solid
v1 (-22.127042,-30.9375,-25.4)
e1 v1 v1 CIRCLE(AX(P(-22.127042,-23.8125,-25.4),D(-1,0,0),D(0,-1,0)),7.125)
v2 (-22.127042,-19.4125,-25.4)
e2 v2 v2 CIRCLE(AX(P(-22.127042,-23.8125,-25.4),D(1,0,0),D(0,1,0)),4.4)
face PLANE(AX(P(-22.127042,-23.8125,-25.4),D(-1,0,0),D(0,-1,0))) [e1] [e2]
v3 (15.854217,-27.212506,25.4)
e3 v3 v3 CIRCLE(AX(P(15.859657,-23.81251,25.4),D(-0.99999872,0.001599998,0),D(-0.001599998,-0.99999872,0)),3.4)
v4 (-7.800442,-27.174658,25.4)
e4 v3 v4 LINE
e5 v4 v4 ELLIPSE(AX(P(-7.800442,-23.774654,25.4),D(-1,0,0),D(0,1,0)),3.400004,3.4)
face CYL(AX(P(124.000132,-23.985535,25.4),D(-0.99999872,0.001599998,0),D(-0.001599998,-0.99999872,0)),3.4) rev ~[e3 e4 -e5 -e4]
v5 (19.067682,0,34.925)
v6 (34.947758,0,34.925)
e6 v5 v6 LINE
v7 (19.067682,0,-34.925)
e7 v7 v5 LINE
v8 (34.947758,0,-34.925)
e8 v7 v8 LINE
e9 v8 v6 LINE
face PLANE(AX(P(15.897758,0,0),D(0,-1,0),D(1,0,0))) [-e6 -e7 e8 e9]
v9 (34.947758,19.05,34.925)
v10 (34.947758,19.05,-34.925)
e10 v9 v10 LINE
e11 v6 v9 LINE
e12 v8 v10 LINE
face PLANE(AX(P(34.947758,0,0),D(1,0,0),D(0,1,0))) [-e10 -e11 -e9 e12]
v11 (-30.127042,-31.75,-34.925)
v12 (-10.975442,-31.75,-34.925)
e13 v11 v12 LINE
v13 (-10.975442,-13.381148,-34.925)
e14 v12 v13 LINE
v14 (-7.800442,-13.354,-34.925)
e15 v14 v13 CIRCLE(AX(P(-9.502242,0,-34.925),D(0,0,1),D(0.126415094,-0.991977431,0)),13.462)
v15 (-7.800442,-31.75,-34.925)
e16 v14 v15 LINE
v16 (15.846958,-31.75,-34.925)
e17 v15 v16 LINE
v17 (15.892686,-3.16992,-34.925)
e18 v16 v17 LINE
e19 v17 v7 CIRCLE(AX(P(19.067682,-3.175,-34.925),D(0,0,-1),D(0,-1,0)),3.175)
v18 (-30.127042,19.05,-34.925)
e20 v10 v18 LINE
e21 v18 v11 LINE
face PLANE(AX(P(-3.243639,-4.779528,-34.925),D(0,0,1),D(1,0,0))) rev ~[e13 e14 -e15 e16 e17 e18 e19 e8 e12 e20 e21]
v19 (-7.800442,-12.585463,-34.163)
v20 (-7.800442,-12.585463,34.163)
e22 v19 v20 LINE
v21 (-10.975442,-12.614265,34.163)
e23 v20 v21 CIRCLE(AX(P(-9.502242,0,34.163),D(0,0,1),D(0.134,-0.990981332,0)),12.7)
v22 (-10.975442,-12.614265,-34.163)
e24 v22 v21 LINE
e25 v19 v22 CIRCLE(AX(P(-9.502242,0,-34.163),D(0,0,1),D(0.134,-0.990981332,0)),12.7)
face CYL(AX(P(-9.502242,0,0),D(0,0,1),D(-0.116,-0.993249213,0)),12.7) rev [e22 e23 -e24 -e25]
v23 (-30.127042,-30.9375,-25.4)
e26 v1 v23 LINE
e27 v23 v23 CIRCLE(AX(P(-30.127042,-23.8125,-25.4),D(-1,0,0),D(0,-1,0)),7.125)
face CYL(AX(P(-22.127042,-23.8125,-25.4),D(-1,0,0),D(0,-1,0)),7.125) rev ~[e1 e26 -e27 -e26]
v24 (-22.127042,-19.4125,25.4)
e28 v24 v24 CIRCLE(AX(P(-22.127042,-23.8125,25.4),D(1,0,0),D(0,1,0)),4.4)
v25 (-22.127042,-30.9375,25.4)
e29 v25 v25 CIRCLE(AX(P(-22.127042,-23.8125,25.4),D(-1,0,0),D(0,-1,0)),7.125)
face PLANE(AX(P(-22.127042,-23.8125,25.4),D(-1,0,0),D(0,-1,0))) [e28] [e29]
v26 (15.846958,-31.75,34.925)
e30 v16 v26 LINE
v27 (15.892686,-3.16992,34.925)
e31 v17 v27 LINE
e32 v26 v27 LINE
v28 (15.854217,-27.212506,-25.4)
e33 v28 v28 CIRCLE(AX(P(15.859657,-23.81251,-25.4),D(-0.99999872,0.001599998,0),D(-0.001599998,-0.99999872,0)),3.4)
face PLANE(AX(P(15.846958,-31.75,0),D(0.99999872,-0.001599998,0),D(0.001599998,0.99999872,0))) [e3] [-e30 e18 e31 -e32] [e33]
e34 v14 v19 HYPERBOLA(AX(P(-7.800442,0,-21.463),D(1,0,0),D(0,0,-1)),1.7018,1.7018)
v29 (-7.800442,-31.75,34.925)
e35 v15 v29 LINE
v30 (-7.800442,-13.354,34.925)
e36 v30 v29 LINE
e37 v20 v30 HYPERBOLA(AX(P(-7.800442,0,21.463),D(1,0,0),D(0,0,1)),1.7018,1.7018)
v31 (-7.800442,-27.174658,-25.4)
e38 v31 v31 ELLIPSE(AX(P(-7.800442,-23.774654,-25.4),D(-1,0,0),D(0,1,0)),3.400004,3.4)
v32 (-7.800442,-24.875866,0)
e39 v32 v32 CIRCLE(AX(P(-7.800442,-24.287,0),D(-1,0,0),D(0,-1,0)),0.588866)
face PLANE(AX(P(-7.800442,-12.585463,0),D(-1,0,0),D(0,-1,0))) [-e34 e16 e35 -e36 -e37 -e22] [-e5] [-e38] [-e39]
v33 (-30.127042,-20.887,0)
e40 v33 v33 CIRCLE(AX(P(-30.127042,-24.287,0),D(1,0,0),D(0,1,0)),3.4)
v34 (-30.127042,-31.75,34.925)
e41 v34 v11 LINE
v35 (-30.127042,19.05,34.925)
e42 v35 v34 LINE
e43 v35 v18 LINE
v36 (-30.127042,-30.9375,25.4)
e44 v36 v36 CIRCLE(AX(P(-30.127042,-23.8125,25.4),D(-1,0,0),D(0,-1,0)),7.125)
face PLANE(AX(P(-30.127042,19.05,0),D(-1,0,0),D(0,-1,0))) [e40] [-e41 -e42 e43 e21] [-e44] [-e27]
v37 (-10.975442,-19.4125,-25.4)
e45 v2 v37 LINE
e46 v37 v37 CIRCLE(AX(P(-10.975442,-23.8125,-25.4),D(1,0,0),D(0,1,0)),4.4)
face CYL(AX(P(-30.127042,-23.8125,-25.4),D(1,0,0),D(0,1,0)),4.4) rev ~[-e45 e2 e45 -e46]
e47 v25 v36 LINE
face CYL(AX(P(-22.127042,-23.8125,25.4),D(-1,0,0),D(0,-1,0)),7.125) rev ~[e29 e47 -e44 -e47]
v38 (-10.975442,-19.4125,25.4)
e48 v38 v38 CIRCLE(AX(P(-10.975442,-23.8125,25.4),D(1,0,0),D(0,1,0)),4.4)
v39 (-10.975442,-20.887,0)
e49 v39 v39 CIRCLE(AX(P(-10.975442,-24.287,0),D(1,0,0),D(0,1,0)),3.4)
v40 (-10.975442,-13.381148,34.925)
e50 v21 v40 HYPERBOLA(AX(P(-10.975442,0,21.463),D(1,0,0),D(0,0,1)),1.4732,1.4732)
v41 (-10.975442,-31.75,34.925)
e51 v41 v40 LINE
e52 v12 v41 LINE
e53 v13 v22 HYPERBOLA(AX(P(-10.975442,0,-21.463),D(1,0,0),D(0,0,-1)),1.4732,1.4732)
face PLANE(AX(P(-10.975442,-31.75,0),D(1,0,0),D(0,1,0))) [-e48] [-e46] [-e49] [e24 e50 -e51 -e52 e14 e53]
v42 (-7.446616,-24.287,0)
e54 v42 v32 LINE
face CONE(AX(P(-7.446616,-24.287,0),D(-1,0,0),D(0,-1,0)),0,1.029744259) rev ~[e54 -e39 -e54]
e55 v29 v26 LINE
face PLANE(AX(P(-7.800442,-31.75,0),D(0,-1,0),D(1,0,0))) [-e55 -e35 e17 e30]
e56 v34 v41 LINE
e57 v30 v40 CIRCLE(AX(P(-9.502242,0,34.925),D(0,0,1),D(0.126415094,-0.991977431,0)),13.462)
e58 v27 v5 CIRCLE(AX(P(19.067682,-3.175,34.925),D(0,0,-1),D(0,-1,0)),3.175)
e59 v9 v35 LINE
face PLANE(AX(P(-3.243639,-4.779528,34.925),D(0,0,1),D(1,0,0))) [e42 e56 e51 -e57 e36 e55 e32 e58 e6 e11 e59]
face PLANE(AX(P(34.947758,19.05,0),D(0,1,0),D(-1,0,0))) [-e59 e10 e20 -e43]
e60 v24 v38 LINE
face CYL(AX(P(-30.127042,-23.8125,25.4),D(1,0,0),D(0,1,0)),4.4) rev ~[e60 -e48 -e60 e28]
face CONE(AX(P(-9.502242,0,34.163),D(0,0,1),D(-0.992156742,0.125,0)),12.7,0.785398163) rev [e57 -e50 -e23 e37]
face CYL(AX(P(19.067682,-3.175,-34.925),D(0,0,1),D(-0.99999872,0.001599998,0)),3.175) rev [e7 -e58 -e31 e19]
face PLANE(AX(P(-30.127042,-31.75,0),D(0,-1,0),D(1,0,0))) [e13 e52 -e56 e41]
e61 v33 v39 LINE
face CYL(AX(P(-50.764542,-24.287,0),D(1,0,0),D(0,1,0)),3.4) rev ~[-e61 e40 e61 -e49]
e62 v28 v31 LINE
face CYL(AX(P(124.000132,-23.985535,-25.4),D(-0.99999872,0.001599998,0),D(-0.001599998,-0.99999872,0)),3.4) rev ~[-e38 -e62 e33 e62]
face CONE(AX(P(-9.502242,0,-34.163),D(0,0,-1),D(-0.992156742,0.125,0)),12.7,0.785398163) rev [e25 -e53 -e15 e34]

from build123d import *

# Parameters (mm, degrees)
F1_DEPTH       = 34.925
F3_D           = 8.8
F3_DEPTH       = 20.6375
F3_CBORE_D     = 14.25
F3_CBORE_DEPTH = 8
F3_TIP         = 2.6437867237
F5_D           = 6.8
F5_DEPTH       = 20.6375
F5_TIP         = 2.0429261047
F6_R           = 3.175
F7_SIZE        = 0.762
F9_D           = 6.8


# Not quite as in the source:
# - ends of sketch curves that miss each other by under 0.0002 mm in the source are joined


with BuildPart() as f1:
    # F0 (on Top) → F1 (new body, symmetric)
    with BuildSketch(Plane.XY):
        with BuildLine():
            Line((-30.1270424985, 1.5875), (-30.1270424985, -31.75))
            Line((-30.1270424985, -31.75), (-15.6690329313, -31.75))
            Line((-15.6690329313, -31.75), (-10.9754424985, -31.75))
            Line((-10.9754424985, -31.75), (-10.9754424985, -12.6142650107))
            ThreePointArc((-10.9754424985, -12.6142650107), (-19.4991930627, -7.8326866028), (-22.1026331175, 1.5875))
            ThreePointArc((-22.1026331175, 1.5875), (-0.5628331886, 9.0209179793), (-7.8004424985, -12.585462914))
            Line((-7.8004424985, -12.585462914), (-7.8004424985, -31.75))
            Line((-7.8004424985, -31.75), (15.8469575015, -31.75))
            Line((15.8469575015, -31.75), (15.8977575015, 0))
            Line((15.8977575015, 0), (34.9477575015, 0))
            Line((34.9477575015, 0), (34.9477575015, 19.05))
            Line((34.9477575015, 19.05), (-30.1270424985, 19.05))
            Line((-30.1270424985, 19.05), (-30.1270424985, 1.5875))
        make_face()
    extrude(amount=F1_DEPTH, both=True)

    # F3
    with Locations(Plane(origin=(-30.1270424985, 0, 0), x_dir=(0, -1, 0), z_dir=(-1, 0, 0))):
        with Locations((23.8125, 25.4), (23.8125, -25.4)):
            CounterBoreHole(F3_D / 2, F3_CBORE_D / 2, F3_CBORE_DEPTH, depth=F3_DEPTH)
            with Locations((0, 0, -(F3_DEPTH + F3_TIP / 2))):  # 118° drill point
                Cone(0, F3_D / 2, F3_TIP, mode=Mode.SUBTRACT)

    # F5
    with Locations(Plane(origin=(-30.1270424985, 0, 0), x_dir=(0, -1, 0), z_dir=(-1, 0, 0))):
        with Locations((24.2870002985, 0)):
            Hole(F5_D / 2, depth=F5_DEPTH)
            with Locations((0, 0, -(F5_DEPTH + F5_TIP / 2))):  # 118° drill point
                Cone(0, F5_D / 2, F5_TIP, mode=Mode.SUBTRACT)

    # F6
    f6_edges = [f1.edges().sort_by_distance(p)[0] for p in [
        (15.897758, 0, 0),
    ]]
    fillet(f6_edges, radius=F6_R)

    # F7
    f7_edges = [f1.edges().sort_by_distance(p)[0] for p in [
        (-9.617446, 12.699477, 34.925),
        (-9.617446, 12.699477, -34.925),
    ]]
    chamfer(f7_edges, length=F7_SIZE)

    # F9 (through all)
    with Locations(Plane(origin=(15.8977168033, -0.0254363469, 0), x_dir=(0.001599998, 0.99999872, 0), z_dir=(0.99999872, -0.001599998, 0))):
        with Locations((-23.7871042605, 25.4), (-23.7871042605, -25.4)):
            Hole(F9_D / 2)


solid = f1.part
